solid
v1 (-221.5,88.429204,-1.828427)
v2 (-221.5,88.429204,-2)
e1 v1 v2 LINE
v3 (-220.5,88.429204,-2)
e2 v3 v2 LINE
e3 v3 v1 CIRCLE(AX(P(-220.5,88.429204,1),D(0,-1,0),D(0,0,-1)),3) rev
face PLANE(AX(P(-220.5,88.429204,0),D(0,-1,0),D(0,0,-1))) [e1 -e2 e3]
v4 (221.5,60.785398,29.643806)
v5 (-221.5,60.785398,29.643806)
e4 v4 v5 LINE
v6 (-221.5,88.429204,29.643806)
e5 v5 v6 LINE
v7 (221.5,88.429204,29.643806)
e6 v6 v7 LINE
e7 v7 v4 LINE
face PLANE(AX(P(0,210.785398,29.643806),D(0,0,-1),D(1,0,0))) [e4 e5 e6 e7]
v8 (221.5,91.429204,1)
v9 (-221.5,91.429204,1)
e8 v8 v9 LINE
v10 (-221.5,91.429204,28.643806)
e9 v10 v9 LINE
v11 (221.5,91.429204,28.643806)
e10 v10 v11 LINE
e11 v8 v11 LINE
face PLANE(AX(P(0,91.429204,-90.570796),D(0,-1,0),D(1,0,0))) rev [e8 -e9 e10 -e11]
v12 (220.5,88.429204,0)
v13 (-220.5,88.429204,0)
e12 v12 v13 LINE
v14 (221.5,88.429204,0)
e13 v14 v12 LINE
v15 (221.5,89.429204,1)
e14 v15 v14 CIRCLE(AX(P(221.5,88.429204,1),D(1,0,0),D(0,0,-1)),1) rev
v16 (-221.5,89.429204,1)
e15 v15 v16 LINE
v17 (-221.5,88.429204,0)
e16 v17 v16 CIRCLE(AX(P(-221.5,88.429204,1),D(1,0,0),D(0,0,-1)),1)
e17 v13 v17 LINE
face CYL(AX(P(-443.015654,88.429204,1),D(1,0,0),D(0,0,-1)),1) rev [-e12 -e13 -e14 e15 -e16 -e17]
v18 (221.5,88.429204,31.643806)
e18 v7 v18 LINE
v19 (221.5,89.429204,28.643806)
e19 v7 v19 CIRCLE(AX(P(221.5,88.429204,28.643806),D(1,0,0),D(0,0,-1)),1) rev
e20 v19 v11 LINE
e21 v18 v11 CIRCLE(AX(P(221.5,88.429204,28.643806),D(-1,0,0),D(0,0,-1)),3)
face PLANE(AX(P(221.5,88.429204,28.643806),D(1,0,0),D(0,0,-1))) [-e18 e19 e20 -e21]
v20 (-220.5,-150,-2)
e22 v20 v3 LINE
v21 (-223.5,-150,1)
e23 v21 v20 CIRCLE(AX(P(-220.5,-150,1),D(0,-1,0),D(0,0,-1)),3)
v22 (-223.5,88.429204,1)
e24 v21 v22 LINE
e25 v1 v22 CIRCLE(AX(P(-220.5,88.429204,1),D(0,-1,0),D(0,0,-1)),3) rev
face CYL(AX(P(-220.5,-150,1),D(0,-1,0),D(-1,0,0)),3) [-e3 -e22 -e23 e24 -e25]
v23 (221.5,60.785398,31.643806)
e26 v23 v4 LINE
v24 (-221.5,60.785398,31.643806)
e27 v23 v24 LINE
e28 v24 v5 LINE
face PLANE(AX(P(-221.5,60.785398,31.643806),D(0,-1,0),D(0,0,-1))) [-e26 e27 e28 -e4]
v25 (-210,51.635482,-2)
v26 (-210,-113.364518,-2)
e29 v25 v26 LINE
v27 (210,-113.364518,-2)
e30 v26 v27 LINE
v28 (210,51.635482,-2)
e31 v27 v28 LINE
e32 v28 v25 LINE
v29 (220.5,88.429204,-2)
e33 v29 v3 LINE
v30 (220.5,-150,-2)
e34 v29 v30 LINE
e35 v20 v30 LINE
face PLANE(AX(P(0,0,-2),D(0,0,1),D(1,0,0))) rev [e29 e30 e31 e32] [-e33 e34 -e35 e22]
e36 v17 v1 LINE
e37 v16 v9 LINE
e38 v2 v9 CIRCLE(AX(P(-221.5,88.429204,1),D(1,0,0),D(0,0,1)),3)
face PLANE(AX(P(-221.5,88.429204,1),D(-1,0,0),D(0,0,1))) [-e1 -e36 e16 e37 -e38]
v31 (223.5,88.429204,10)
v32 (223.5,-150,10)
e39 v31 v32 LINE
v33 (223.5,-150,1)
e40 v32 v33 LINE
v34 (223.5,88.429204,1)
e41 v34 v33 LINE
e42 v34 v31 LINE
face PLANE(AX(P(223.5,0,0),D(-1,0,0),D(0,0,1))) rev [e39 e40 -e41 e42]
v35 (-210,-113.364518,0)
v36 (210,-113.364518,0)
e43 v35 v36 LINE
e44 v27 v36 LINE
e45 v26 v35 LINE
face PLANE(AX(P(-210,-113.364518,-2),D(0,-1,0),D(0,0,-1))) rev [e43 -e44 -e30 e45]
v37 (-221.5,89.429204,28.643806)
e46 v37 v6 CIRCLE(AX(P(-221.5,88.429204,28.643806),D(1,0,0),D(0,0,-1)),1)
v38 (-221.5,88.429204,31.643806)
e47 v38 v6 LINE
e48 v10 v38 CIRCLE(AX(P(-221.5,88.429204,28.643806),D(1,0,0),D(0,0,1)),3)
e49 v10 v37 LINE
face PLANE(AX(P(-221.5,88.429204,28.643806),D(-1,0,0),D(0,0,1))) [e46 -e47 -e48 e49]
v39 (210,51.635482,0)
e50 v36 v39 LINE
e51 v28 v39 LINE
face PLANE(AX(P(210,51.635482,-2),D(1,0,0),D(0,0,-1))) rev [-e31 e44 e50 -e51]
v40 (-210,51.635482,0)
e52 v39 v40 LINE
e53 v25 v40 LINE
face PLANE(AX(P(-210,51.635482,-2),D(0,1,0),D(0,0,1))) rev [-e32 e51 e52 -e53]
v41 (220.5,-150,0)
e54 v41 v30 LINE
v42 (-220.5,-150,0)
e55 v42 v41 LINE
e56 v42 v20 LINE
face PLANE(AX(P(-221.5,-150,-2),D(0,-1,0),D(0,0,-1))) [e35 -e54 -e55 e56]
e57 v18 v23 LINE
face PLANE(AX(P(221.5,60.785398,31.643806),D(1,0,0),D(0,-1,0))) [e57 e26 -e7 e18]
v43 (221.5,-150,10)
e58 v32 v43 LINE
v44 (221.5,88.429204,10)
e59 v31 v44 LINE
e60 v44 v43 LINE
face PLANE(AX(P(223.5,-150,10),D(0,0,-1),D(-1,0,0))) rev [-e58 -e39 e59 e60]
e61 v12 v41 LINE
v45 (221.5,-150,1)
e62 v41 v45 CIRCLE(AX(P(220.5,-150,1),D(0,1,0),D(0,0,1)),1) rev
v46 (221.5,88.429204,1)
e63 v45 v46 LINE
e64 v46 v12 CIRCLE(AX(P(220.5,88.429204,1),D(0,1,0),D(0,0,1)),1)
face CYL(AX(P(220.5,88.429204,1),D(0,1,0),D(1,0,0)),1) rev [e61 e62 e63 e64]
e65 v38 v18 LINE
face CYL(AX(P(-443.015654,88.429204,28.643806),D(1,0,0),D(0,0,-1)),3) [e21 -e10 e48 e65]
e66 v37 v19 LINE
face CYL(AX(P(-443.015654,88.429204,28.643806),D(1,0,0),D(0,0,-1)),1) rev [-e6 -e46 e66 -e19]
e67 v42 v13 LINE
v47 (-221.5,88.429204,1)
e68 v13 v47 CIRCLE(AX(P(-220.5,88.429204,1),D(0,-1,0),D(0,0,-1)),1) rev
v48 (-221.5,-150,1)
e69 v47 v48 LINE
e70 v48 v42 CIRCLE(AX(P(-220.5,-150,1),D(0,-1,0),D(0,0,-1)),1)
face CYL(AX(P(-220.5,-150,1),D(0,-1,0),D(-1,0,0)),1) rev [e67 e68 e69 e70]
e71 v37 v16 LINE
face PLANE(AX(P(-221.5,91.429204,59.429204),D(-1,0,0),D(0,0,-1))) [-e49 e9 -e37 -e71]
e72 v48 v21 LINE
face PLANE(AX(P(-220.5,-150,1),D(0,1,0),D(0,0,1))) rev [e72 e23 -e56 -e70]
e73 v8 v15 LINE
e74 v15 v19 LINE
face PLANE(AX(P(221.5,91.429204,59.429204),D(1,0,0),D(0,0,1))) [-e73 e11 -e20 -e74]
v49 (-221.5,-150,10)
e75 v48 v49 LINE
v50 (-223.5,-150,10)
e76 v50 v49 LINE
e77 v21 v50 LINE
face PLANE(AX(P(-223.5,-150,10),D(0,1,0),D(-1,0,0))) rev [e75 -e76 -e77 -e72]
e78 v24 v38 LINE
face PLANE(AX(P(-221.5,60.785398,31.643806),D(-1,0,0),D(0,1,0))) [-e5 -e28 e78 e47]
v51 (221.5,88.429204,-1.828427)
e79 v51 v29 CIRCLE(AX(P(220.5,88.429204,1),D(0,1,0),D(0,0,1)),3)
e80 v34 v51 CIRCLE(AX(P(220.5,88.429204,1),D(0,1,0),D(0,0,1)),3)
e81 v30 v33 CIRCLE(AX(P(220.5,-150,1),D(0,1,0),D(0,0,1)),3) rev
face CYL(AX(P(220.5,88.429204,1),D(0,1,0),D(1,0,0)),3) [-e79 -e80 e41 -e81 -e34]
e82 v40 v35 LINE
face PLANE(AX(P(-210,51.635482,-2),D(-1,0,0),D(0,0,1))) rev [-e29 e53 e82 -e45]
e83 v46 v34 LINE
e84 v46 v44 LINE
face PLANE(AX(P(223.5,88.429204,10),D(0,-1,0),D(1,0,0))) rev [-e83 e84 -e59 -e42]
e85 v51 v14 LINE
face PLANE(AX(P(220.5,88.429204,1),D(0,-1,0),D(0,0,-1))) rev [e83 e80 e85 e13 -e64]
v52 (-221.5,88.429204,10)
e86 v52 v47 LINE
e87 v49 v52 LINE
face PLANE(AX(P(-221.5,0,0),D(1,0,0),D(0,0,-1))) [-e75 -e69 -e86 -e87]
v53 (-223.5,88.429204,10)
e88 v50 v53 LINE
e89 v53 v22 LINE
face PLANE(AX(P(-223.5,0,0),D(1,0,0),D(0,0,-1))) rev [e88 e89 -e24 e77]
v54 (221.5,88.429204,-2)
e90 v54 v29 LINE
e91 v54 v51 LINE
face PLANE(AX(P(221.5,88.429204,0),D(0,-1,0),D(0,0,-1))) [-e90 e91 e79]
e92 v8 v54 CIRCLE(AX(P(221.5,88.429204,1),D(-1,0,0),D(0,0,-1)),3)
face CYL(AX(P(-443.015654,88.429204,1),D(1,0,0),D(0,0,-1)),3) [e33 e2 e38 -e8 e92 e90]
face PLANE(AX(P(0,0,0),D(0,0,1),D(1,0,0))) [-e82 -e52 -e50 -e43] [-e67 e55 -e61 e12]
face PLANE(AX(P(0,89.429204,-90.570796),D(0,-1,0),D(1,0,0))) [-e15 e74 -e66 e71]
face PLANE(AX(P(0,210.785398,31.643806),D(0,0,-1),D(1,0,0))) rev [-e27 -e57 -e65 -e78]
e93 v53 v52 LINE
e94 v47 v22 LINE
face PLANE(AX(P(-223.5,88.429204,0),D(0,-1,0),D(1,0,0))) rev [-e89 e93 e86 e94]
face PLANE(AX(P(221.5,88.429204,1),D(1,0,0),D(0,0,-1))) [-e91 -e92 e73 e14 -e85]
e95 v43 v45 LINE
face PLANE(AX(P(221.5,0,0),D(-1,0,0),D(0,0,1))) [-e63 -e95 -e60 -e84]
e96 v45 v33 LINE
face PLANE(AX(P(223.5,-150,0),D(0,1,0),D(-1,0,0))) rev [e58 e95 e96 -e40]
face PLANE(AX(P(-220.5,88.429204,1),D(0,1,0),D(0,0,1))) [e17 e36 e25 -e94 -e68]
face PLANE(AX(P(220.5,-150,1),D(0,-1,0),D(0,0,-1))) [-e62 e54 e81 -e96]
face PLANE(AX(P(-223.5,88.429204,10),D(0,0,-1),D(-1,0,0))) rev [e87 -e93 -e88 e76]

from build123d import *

# Parameters (mm, degrees)
SKETCH1_W                    = 443
SKETCH1_H                    = 300
BASE_FLANGE1_DEPTH           = 2
SKETCHED_START               = -221.5
SKETCHED_BEND1_DEPTH         = 443
SKETCHED_BEND1_2_DEPTH       = 443
SKETCHED_BEND2_DEPTH         = 443
SKETCHED_BEND2_2_DEPTH       = 443
EDGE_FLANGE1_STRIP_W         = 10
EDGE_FLANGE1_STRIP_H         = 2
EDGE_FLANGE1_STRIP_CUT_DEPTH = 238.429203673
EDGE_FLANGE1_DEPTH           = 238.429203673
EDGE_FLANGE2_STRIP_W         = 10
EDGE_FLANGE2_STRIP_H         = 2
EDGE_FLANGE2_STRIP_CUT_DEPTH = 238.429203673
EDGE_FLANGE2_DEPTH           = 238.429203673
SKETCH15_W                   = 420
SKETCH15_H                   = 165
CUT_EXTRUDE1_DEPTH           = 272.023210126


# Read off the part's stored shape, not the designer's step: Sketched Bend1, Sketched Bend2
# Sheet-metal steps are written as plain solids
with BuildPart() as part:
    # Sketch1 → Base-Flange1 (new body)
    with BuildSketch(Plane.XY):
        Rectangle(SKETCH1_W, SKETCH1_H)
    extrude(amount=-BASE_FLANGE1_DEPTH)

    # Sketched Bend1 outline → Sketched Bend1 (cut)
    with BuildSketch(Plane.YZ.offset(SKETCHED_START)):
        with BuildLine():
            Line((150, 0), (91.257630798, 0))
            ThreePointArc((91.257630798, 0), (90.161254481, -1.449489743), (88.429203673, -2))
            Line((88.429203673, -2), (150, -2))
            Line((150, -2), (150, 0))
        make_face()
    extrude(amount=SKETCHED_BEND1_DEPTH, mode=Mode.SUBTRACT)

    # Sketched Bend1 2 outline → Sketched Bend1 2 (add)
    with BuildSketch(Plane.YZ.offset(SKETCHED_START)):
        with BuildLine():
            Line((91.429203673, 1), (91.429203673, 59.429203673))
            Line((91.429203673, 59.429203673), (89.429203673, 59.429203673))
            Line((89.429203673, 59.429203673), (89.429203673, 1))
            ThreePointArc((89.429203673, 1), (89.136310454, 0.292893219), (88.429203673, 0))
            Line((88.429203673, 0), (91.257630798, 0))
            ThreePointArc((91.257630798, 0), (91.385999352, 0.492694064), (91.429203673, 1))
        make_face()
    extrude(amount=SKETCHED_BEND1_2_DEPTH)

    # Sketched Bend2 outline → Sketched Bend2 (cut)
    with BuildSketch(Plane.YZ.offset(SKETCHED_START)):
        with BuildLine():
            ThreePointArc((89.429203673, 31.472232635), (90.878693416, 30.375856318), (91.429203673, 28.64380551))
            Line((91.429203673, 28.64380551), (91.429203673, 59.429203673))
            Line((91.429203673, 59.429203673), (89.429203673, 59.429203673))
            Line((89.429203673, 59.429203673), (89.429203673, 31.472232635))
        make_face()
    extrude(amount=SKETCHED_BEND2_DEPTH, mode=Mode.SUBTRACT)

    # Sketched Bend2 2 outline → Sketched Bend2 2 (add)
    with BuildSketch(Plane.YZ.offset(SKETCHED_START)):
        with BuildLine():
            Line((89.429203673, 28.64380551), (89.429203673, 31.472232635))
            ThreePointArc((89.429203673, 31.472232635), (88.936509609, 31.600601189), (88.429203673, 31.64380551))
            Line((88.429203673, 31.64380551), (60.785398163, 31.64380551))
            Line((60.785398163, 31.64380551), (60.785398163, 29.64380551))
            Line((60.785398163, 29.64380551), (88.429203673, 29.64380551))
            ThreePointArc((88.429203673, 29.64380551), (89.136310454, 29.350912291), (89.429203673, 28.64380551))
        make_face()
    extrude(amount=SKETCHED_BEND2_2_DEPTH)

    # Edge-Flange1 strip (across the edge) → Edge-Flange1 strip cut (cut)
    with BuildSketch(Plane(origin=(-221.5, 88.429203673, 0), x_dir=(1, 0, 0), z_dir=(0, -1, 0))):
        with Locations((-4, -1)):
            Rectangle(EDGE_FLANGE1_STRIP_W, EDGE_FLANGE1_STRIP_H)
    extrude(amount=EDGE_FLANGE1_STRIP_CUT_DEPTH, mode=Mode.SUBTRACT)

    # Edge-Flange1 section (across the edge) → Edge-Flange1 (add)
    with BuildSketch(Plane(origin=(-221.5, 88.429203673, 0), x_dir=(1, 0, 0), z_dir=(0, -1, 0))):
        with BuildLine():
            Line((-2, 1), (-2, 10))
            Line((-2, 10), (0, 10))
            Line((0, 10), (0, 1))
            ThreePointArc((0, 1), (0.292893219, 0.292893219), (1, 0))
            Line((1, 0), (1, -2))
            ThreePointArc((1, -2), (-1.121320344, -1.121320344), (-2, 1))
        make_face()
    extrude(amount=EDGE_FLANGE1_DEPTH)

    # Edge-Flange2 strip (across the edge) → Edge-Flange2 strip cut (cut)
    with BuildSketch(Plane(origin=(221.5, -150, 0), x_dir=(-1, 0, 0), z_dir=(0, 1, 0))):
        with Locations((-4, -1)):
            Rectangle(EDGE_FLANGE2_STRIP_W, EDGE_FLANGE2_STRIP_H)
    extrude(amount=EDGE_FLANGE2_STRIP_CUT_DEPTH, mode=Mode.SUBTRACT)

    # Edge-Flange2 section (across the edge) → Edge-Flange2 (add)
    with BuildSketch(Plane(origin=(221.5, -150, 0), x_dir=(-1, 0, 0), z_dir=(0, 1, 0))):
        with BuildLine():
            Line((-2, 1), (-2, 10))
            Line((-2, 10), (0, 10))
            Line((0, 10), (0, 1))
            ThreePointArc((0, 1), (0.292893219, 0.292893219), (1, 0))
            Line((1, 0), (1, -2))
            ThreePointArc((1, -2), (-1.121320344, -1.121320344), (-2, 1))
        make_face()
    extrude(amount=EDGE_FLANGE2_DEPTH)

    # Sketch15 → Cut-Extrude1 (cut, through all)
    with BuildSketch(Plane.XY):
        with Locations((0, -30.864518484)):
            Rectangle(SKETCH15_W, SKETCH15_H)
    extrude(amount=-CUT_EXTRUDE1_DEPTH, mode=Mode.SUBTRACT)


solid = part.part
